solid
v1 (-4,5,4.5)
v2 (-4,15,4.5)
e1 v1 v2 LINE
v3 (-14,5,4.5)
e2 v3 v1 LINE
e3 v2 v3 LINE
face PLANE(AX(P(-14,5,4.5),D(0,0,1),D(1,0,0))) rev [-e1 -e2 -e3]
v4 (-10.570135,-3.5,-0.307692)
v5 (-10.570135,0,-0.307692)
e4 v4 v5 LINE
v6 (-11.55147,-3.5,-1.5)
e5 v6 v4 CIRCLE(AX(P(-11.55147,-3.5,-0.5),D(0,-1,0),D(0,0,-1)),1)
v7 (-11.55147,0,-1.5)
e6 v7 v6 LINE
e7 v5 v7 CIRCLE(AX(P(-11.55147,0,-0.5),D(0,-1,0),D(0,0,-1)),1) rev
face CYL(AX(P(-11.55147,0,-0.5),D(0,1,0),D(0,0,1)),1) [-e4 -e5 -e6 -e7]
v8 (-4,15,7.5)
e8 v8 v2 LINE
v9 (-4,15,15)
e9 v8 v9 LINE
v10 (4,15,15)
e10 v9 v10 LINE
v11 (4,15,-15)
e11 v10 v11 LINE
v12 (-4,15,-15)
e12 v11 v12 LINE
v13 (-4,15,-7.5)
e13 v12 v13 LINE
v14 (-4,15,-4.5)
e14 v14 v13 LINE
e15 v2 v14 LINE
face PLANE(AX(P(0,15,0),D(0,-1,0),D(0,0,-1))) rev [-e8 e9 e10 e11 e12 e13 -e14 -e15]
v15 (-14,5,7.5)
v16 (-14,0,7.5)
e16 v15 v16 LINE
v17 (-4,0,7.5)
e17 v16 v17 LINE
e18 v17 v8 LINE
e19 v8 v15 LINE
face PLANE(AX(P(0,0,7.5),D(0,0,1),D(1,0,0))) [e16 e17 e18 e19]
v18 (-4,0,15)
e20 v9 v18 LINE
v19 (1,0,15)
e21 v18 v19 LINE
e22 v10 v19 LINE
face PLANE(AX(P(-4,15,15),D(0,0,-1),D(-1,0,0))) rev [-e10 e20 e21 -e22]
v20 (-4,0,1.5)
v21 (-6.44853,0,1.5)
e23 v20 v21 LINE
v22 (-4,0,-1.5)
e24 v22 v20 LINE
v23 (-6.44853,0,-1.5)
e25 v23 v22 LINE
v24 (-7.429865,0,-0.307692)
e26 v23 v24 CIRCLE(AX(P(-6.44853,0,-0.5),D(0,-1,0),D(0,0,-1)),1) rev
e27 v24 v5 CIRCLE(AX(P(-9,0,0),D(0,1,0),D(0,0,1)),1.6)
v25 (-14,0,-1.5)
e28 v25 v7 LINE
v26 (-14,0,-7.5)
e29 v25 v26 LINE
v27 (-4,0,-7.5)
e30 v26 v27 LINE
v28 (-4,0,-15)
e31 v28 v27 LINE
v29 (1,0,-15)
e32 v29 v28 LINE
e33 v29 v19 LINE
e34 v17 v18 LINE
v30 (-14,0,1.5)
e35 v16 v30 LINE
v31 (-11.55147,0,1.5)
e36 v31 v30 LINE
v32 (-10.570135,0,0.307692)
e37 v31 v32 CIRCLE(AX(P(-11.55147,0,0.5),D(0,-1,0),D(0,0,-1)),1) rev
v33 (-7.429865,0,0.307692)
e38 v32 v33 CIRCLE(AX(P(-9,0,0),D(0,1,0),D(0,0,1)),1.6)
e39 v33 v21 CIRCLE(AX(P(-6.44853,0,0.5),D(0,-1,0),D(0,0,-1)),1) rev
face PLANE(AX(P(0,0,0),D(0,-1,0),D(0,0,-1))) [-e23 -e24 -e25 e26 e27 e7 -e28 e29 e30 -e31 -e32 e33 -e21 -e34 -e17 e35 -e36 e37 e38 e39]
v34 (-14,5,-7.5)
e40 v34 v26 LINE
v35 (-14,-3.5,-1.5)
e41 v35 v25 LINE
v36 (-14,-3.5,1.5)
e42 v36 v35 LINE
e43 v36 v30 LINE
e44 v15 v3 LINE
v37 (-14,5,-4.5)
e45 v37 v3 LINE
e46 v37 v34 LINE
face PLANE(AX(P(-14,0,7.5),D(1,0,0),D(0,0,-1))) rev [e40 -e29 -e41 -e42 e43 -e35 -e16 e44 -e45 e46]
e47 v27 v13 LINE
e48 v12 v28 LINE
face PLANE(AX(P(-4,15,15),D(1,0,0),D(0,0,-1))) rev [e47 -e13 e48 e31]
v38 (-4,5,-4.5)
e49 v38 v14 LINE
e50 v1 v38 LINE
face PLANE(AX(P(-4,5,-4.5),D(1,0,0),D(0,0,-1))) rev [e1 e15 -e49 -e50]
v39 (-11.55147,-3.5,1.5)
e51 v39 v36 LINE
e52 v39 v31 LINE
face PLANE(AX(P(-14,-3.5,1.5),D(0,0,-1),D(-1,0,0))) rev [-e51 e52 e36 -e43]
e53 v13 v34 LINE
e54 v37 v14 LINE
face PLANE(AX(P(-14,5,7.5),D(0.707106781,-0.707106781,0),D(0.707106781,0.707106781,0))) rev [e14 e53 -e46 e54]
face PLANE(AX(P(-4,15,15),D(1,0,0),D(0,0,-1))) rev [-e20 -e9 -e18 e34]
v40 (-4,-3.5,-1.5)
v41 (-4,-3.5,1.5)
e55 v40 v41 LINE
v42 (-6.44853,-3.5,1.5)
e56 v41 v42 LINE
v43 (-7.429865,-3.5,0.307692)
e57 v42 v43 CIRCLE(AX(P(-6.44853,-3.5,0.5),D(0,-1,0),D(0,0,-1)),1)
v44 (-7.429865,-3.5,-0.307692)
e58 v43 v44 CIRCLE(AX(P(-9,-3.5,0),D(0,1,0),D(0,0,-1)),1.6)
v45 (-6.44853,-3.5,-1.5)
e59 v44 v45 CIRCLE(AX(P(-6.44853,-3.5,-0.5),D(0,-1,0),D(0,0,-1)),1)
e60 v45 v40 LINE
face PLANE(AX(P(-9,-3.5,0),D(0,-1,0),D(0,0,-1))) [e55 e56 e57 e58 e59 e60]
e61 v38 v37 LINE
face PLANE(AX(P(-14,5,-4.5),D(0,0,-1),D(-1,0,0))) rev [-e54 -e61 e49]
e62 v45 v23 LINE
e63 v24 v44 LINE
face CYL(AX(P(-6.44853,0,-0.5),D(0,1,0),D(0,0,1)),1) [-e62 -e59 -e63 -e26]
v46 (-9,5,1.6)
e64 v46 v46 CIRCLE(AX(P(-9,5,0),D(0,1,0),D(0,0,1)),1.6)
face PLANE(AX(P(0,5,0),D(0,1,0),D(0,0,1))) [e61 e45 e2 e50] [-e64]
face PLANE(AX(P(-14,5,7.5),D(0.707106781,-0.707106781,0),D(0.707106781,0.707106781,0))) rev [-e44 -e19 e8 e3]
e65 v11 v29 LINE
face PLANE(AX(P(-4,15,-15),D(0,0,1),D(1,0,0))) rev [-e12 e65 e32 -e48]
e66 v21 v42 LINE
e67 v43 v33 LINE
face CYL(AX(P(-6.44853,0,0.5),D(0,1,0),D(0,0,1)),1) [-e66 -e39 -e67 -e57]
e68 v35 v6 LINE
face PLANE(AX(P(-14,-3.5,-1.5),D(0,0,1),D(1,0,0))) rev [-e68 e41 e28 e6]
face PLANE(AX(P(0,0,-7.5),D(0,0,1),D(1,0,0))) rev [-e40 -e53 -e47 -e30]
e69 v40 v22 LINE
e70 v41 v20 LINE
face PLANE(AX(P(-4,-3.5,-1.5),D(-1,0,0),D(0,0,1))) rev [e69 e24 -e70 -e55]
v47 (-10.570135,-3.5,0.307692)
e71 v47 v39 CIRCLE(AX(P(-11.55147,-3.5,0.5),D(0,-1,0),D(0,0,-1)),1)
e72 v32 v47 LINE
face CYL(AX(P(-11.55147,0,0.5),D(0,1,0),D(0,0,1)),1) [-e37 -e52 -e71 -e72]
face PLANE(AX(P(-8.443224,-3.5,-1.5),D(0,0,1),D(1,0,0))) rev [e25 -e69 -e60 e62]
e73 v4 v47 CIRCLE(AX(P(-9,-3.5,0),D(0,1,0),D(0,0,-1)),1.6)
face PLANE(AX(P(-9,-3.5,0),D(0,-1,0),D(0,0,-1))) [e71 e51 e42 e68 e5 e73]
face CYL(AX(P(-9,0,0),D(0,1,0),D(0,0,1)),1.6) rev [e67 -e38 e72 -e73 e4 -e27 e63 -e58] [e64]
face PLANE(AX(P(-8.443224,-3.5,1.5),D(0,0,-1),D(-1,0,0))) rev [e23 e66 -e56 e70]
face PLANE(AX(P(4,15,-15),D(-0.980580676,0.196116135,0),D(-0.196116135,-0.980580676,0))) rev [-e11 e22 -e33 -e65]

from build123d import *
from build123d.topology import SkipClean

# Parameters (mm, degrees)
CROQUIS1_W              = 8
CROQUIS1_H              = 30
SALIENTE_EXTRUIR1_DEPTH = 15
CORTAR_EXTRUIR1_DEPTH   = 34.778691508
SALIENTE_EXTRUIR2_DEPTH = 7.5
CROQUIS4_W              = 10
CROQUIS4_H              = 9
CORTAR_EXTRUIR2_DEPTH   = 10
CROQUIS5_R              = 1.6
CORTAR_EXTRUIR3_DEPTH   = 23.825424421
SALIENTE_EXTRUIR3_DEPTH = 3.5
REDONDEO1_R             = 1


with BuildPart() as part:
    # Croquis1 → Saliente-Extruir1 (new body)
    with BuildSketch(Plane(origin=(0, 0, 0), x_dir=(1, 0, 0), z_dir=(0, 1, 0))):
        Rectangle(CROQUIS1_W, CROQUIS1_H)
    extrude(amount=SALIENTE_EXTRUIR1_DEPTH)

    # Croquis2 → Cortar-Extruir1 (cut, through all)
    with BuildSketch(Plane.XY.offset(15)):
        Polygon((4, 15), (1, 0), (4, 0), align=None)
    extrude(amount=-CORTAR_EXTRUIR1_DEPTH, mode=Mode.SUBTRACT)

    # Croquis3 → Saliente-Extruir2 (add, symmetric)
    with BuildSketch(Plane.XY):
        Polygon((-14, 0), (-4, 0), (-4, 15), (-14, 5), align=None)
    extrude(amount=SALIENTE_EXTRUIR2_DEPTH, both=True)

    # Croquis4 → Cortar-Extruir2 (cut)
    with BuildSketch(Plane(origin=(0, 15, 0), x_dir=(1, 0, 0), z_dir=(0, 1, 0))):
        with Locations((-9, 0)):
            Rectangle(CROQUIS4_W, CROQUIS4_H)
    extrude(amount=-CORTAR_EXTRUIR2_DEPTH, mode=Mode.SUBTRACT)

    # Croquis5 → Cortar-Extruir3 (cut, through all)
    with BuildSketch(Plane(origin=(0, 5, 0), x_dir=(1, 0, 0), z_dir=(0, 1, 0))):
        with Locations(Location((-9, 0, 0), (0, 0, 270))):
            Circle(CROQUIS5_R)
    extrude(amount=-CORTAR_EXTRUIR3_DEPTH, mode=Mode.SUBTRACT)

    # Croquis6 → Saliente-Extruir3 (add)
    with SkipClean():  # the faces are left unmerged after this step: merging them gives an invalid solid
        with BuildSketch(Plane.XZ):
            with BuildLine():
                Line((-8.443223564, 1.5), (-4, 1.5))
                Line((-4, 1.5), (-4, -1.5))
                Line((-4, -1.5), (-8.443223564, -1.5))
                ThreePointArc((-8.443223564, -1.5), (-7.4, 0), (-8.443223564, 1.5))
            make_face()
            with BuildLine():
                Line((-14, -1.5), (-9.556776436, -1.5))
                ThreePointArc((-9.556776436, -1.5), (-10.6, 0), (-9.556776436, 1.5))
                Line((-9.556776436, 1.5), (-14, 1.5))
                Line((-14, 1.5), (-14, -1.5))
            make_face()
        extrude(amount=SALIENTE_EXTRUIR3_DEPTH)

    # Redondeo1
    # the kernel refuses this fillet: 1 mm, written as the material it takes off along each edge
    with BuildSketch(Plane(origin=(-8.443223564, 0, 1.5), x_dir=(1, 0, 0), z_dir=(0, -1, 0)), Plane(origin=(-9.556776436, 0, -1.5), x_dir=(-1, 0, 0), z_dir=(0, -1, 0))) as redondeo1_piece_1:
        with BuildLine():
            CenterArc((1.994693728, -1), REDONDEO1_R, 90, 101.087489211)
            ThreePointArc((1.01335905, -1.192307692), (0.662378184, -0.463823369), (0, 0))
            Line((0, 0), (1.994693728, 0))
        make_face()
    extrude(amount=8.48673432, mode=Mode.SUBTRACT)
    with BuildSketch(Plane(origin=(-8.443223564, 0, -1.5), x_dir=(1, 0, 0), z_dir=(0, -1, 0)), Plane(origin=(-9.556776436, 0, 1.5), x_dir=(-1, 0, 0), z_dir=(0, -1, 0))) as redondeo1_piece_2:
        with BuildLine():
            CenterArc((1.994693728, 1), REDONDEO1_R, 168.912510789, 101.087489211)
            ThreePointArc((1.01335905, 1.192307692), (0.662378184, 0.463823369), (0, 0))
            Line((0, 0), (1.994693728, 0))
        make_face()
    extrude(amount=8.48673432, mode=Mode.SUBTRACT)


solid = part.part
